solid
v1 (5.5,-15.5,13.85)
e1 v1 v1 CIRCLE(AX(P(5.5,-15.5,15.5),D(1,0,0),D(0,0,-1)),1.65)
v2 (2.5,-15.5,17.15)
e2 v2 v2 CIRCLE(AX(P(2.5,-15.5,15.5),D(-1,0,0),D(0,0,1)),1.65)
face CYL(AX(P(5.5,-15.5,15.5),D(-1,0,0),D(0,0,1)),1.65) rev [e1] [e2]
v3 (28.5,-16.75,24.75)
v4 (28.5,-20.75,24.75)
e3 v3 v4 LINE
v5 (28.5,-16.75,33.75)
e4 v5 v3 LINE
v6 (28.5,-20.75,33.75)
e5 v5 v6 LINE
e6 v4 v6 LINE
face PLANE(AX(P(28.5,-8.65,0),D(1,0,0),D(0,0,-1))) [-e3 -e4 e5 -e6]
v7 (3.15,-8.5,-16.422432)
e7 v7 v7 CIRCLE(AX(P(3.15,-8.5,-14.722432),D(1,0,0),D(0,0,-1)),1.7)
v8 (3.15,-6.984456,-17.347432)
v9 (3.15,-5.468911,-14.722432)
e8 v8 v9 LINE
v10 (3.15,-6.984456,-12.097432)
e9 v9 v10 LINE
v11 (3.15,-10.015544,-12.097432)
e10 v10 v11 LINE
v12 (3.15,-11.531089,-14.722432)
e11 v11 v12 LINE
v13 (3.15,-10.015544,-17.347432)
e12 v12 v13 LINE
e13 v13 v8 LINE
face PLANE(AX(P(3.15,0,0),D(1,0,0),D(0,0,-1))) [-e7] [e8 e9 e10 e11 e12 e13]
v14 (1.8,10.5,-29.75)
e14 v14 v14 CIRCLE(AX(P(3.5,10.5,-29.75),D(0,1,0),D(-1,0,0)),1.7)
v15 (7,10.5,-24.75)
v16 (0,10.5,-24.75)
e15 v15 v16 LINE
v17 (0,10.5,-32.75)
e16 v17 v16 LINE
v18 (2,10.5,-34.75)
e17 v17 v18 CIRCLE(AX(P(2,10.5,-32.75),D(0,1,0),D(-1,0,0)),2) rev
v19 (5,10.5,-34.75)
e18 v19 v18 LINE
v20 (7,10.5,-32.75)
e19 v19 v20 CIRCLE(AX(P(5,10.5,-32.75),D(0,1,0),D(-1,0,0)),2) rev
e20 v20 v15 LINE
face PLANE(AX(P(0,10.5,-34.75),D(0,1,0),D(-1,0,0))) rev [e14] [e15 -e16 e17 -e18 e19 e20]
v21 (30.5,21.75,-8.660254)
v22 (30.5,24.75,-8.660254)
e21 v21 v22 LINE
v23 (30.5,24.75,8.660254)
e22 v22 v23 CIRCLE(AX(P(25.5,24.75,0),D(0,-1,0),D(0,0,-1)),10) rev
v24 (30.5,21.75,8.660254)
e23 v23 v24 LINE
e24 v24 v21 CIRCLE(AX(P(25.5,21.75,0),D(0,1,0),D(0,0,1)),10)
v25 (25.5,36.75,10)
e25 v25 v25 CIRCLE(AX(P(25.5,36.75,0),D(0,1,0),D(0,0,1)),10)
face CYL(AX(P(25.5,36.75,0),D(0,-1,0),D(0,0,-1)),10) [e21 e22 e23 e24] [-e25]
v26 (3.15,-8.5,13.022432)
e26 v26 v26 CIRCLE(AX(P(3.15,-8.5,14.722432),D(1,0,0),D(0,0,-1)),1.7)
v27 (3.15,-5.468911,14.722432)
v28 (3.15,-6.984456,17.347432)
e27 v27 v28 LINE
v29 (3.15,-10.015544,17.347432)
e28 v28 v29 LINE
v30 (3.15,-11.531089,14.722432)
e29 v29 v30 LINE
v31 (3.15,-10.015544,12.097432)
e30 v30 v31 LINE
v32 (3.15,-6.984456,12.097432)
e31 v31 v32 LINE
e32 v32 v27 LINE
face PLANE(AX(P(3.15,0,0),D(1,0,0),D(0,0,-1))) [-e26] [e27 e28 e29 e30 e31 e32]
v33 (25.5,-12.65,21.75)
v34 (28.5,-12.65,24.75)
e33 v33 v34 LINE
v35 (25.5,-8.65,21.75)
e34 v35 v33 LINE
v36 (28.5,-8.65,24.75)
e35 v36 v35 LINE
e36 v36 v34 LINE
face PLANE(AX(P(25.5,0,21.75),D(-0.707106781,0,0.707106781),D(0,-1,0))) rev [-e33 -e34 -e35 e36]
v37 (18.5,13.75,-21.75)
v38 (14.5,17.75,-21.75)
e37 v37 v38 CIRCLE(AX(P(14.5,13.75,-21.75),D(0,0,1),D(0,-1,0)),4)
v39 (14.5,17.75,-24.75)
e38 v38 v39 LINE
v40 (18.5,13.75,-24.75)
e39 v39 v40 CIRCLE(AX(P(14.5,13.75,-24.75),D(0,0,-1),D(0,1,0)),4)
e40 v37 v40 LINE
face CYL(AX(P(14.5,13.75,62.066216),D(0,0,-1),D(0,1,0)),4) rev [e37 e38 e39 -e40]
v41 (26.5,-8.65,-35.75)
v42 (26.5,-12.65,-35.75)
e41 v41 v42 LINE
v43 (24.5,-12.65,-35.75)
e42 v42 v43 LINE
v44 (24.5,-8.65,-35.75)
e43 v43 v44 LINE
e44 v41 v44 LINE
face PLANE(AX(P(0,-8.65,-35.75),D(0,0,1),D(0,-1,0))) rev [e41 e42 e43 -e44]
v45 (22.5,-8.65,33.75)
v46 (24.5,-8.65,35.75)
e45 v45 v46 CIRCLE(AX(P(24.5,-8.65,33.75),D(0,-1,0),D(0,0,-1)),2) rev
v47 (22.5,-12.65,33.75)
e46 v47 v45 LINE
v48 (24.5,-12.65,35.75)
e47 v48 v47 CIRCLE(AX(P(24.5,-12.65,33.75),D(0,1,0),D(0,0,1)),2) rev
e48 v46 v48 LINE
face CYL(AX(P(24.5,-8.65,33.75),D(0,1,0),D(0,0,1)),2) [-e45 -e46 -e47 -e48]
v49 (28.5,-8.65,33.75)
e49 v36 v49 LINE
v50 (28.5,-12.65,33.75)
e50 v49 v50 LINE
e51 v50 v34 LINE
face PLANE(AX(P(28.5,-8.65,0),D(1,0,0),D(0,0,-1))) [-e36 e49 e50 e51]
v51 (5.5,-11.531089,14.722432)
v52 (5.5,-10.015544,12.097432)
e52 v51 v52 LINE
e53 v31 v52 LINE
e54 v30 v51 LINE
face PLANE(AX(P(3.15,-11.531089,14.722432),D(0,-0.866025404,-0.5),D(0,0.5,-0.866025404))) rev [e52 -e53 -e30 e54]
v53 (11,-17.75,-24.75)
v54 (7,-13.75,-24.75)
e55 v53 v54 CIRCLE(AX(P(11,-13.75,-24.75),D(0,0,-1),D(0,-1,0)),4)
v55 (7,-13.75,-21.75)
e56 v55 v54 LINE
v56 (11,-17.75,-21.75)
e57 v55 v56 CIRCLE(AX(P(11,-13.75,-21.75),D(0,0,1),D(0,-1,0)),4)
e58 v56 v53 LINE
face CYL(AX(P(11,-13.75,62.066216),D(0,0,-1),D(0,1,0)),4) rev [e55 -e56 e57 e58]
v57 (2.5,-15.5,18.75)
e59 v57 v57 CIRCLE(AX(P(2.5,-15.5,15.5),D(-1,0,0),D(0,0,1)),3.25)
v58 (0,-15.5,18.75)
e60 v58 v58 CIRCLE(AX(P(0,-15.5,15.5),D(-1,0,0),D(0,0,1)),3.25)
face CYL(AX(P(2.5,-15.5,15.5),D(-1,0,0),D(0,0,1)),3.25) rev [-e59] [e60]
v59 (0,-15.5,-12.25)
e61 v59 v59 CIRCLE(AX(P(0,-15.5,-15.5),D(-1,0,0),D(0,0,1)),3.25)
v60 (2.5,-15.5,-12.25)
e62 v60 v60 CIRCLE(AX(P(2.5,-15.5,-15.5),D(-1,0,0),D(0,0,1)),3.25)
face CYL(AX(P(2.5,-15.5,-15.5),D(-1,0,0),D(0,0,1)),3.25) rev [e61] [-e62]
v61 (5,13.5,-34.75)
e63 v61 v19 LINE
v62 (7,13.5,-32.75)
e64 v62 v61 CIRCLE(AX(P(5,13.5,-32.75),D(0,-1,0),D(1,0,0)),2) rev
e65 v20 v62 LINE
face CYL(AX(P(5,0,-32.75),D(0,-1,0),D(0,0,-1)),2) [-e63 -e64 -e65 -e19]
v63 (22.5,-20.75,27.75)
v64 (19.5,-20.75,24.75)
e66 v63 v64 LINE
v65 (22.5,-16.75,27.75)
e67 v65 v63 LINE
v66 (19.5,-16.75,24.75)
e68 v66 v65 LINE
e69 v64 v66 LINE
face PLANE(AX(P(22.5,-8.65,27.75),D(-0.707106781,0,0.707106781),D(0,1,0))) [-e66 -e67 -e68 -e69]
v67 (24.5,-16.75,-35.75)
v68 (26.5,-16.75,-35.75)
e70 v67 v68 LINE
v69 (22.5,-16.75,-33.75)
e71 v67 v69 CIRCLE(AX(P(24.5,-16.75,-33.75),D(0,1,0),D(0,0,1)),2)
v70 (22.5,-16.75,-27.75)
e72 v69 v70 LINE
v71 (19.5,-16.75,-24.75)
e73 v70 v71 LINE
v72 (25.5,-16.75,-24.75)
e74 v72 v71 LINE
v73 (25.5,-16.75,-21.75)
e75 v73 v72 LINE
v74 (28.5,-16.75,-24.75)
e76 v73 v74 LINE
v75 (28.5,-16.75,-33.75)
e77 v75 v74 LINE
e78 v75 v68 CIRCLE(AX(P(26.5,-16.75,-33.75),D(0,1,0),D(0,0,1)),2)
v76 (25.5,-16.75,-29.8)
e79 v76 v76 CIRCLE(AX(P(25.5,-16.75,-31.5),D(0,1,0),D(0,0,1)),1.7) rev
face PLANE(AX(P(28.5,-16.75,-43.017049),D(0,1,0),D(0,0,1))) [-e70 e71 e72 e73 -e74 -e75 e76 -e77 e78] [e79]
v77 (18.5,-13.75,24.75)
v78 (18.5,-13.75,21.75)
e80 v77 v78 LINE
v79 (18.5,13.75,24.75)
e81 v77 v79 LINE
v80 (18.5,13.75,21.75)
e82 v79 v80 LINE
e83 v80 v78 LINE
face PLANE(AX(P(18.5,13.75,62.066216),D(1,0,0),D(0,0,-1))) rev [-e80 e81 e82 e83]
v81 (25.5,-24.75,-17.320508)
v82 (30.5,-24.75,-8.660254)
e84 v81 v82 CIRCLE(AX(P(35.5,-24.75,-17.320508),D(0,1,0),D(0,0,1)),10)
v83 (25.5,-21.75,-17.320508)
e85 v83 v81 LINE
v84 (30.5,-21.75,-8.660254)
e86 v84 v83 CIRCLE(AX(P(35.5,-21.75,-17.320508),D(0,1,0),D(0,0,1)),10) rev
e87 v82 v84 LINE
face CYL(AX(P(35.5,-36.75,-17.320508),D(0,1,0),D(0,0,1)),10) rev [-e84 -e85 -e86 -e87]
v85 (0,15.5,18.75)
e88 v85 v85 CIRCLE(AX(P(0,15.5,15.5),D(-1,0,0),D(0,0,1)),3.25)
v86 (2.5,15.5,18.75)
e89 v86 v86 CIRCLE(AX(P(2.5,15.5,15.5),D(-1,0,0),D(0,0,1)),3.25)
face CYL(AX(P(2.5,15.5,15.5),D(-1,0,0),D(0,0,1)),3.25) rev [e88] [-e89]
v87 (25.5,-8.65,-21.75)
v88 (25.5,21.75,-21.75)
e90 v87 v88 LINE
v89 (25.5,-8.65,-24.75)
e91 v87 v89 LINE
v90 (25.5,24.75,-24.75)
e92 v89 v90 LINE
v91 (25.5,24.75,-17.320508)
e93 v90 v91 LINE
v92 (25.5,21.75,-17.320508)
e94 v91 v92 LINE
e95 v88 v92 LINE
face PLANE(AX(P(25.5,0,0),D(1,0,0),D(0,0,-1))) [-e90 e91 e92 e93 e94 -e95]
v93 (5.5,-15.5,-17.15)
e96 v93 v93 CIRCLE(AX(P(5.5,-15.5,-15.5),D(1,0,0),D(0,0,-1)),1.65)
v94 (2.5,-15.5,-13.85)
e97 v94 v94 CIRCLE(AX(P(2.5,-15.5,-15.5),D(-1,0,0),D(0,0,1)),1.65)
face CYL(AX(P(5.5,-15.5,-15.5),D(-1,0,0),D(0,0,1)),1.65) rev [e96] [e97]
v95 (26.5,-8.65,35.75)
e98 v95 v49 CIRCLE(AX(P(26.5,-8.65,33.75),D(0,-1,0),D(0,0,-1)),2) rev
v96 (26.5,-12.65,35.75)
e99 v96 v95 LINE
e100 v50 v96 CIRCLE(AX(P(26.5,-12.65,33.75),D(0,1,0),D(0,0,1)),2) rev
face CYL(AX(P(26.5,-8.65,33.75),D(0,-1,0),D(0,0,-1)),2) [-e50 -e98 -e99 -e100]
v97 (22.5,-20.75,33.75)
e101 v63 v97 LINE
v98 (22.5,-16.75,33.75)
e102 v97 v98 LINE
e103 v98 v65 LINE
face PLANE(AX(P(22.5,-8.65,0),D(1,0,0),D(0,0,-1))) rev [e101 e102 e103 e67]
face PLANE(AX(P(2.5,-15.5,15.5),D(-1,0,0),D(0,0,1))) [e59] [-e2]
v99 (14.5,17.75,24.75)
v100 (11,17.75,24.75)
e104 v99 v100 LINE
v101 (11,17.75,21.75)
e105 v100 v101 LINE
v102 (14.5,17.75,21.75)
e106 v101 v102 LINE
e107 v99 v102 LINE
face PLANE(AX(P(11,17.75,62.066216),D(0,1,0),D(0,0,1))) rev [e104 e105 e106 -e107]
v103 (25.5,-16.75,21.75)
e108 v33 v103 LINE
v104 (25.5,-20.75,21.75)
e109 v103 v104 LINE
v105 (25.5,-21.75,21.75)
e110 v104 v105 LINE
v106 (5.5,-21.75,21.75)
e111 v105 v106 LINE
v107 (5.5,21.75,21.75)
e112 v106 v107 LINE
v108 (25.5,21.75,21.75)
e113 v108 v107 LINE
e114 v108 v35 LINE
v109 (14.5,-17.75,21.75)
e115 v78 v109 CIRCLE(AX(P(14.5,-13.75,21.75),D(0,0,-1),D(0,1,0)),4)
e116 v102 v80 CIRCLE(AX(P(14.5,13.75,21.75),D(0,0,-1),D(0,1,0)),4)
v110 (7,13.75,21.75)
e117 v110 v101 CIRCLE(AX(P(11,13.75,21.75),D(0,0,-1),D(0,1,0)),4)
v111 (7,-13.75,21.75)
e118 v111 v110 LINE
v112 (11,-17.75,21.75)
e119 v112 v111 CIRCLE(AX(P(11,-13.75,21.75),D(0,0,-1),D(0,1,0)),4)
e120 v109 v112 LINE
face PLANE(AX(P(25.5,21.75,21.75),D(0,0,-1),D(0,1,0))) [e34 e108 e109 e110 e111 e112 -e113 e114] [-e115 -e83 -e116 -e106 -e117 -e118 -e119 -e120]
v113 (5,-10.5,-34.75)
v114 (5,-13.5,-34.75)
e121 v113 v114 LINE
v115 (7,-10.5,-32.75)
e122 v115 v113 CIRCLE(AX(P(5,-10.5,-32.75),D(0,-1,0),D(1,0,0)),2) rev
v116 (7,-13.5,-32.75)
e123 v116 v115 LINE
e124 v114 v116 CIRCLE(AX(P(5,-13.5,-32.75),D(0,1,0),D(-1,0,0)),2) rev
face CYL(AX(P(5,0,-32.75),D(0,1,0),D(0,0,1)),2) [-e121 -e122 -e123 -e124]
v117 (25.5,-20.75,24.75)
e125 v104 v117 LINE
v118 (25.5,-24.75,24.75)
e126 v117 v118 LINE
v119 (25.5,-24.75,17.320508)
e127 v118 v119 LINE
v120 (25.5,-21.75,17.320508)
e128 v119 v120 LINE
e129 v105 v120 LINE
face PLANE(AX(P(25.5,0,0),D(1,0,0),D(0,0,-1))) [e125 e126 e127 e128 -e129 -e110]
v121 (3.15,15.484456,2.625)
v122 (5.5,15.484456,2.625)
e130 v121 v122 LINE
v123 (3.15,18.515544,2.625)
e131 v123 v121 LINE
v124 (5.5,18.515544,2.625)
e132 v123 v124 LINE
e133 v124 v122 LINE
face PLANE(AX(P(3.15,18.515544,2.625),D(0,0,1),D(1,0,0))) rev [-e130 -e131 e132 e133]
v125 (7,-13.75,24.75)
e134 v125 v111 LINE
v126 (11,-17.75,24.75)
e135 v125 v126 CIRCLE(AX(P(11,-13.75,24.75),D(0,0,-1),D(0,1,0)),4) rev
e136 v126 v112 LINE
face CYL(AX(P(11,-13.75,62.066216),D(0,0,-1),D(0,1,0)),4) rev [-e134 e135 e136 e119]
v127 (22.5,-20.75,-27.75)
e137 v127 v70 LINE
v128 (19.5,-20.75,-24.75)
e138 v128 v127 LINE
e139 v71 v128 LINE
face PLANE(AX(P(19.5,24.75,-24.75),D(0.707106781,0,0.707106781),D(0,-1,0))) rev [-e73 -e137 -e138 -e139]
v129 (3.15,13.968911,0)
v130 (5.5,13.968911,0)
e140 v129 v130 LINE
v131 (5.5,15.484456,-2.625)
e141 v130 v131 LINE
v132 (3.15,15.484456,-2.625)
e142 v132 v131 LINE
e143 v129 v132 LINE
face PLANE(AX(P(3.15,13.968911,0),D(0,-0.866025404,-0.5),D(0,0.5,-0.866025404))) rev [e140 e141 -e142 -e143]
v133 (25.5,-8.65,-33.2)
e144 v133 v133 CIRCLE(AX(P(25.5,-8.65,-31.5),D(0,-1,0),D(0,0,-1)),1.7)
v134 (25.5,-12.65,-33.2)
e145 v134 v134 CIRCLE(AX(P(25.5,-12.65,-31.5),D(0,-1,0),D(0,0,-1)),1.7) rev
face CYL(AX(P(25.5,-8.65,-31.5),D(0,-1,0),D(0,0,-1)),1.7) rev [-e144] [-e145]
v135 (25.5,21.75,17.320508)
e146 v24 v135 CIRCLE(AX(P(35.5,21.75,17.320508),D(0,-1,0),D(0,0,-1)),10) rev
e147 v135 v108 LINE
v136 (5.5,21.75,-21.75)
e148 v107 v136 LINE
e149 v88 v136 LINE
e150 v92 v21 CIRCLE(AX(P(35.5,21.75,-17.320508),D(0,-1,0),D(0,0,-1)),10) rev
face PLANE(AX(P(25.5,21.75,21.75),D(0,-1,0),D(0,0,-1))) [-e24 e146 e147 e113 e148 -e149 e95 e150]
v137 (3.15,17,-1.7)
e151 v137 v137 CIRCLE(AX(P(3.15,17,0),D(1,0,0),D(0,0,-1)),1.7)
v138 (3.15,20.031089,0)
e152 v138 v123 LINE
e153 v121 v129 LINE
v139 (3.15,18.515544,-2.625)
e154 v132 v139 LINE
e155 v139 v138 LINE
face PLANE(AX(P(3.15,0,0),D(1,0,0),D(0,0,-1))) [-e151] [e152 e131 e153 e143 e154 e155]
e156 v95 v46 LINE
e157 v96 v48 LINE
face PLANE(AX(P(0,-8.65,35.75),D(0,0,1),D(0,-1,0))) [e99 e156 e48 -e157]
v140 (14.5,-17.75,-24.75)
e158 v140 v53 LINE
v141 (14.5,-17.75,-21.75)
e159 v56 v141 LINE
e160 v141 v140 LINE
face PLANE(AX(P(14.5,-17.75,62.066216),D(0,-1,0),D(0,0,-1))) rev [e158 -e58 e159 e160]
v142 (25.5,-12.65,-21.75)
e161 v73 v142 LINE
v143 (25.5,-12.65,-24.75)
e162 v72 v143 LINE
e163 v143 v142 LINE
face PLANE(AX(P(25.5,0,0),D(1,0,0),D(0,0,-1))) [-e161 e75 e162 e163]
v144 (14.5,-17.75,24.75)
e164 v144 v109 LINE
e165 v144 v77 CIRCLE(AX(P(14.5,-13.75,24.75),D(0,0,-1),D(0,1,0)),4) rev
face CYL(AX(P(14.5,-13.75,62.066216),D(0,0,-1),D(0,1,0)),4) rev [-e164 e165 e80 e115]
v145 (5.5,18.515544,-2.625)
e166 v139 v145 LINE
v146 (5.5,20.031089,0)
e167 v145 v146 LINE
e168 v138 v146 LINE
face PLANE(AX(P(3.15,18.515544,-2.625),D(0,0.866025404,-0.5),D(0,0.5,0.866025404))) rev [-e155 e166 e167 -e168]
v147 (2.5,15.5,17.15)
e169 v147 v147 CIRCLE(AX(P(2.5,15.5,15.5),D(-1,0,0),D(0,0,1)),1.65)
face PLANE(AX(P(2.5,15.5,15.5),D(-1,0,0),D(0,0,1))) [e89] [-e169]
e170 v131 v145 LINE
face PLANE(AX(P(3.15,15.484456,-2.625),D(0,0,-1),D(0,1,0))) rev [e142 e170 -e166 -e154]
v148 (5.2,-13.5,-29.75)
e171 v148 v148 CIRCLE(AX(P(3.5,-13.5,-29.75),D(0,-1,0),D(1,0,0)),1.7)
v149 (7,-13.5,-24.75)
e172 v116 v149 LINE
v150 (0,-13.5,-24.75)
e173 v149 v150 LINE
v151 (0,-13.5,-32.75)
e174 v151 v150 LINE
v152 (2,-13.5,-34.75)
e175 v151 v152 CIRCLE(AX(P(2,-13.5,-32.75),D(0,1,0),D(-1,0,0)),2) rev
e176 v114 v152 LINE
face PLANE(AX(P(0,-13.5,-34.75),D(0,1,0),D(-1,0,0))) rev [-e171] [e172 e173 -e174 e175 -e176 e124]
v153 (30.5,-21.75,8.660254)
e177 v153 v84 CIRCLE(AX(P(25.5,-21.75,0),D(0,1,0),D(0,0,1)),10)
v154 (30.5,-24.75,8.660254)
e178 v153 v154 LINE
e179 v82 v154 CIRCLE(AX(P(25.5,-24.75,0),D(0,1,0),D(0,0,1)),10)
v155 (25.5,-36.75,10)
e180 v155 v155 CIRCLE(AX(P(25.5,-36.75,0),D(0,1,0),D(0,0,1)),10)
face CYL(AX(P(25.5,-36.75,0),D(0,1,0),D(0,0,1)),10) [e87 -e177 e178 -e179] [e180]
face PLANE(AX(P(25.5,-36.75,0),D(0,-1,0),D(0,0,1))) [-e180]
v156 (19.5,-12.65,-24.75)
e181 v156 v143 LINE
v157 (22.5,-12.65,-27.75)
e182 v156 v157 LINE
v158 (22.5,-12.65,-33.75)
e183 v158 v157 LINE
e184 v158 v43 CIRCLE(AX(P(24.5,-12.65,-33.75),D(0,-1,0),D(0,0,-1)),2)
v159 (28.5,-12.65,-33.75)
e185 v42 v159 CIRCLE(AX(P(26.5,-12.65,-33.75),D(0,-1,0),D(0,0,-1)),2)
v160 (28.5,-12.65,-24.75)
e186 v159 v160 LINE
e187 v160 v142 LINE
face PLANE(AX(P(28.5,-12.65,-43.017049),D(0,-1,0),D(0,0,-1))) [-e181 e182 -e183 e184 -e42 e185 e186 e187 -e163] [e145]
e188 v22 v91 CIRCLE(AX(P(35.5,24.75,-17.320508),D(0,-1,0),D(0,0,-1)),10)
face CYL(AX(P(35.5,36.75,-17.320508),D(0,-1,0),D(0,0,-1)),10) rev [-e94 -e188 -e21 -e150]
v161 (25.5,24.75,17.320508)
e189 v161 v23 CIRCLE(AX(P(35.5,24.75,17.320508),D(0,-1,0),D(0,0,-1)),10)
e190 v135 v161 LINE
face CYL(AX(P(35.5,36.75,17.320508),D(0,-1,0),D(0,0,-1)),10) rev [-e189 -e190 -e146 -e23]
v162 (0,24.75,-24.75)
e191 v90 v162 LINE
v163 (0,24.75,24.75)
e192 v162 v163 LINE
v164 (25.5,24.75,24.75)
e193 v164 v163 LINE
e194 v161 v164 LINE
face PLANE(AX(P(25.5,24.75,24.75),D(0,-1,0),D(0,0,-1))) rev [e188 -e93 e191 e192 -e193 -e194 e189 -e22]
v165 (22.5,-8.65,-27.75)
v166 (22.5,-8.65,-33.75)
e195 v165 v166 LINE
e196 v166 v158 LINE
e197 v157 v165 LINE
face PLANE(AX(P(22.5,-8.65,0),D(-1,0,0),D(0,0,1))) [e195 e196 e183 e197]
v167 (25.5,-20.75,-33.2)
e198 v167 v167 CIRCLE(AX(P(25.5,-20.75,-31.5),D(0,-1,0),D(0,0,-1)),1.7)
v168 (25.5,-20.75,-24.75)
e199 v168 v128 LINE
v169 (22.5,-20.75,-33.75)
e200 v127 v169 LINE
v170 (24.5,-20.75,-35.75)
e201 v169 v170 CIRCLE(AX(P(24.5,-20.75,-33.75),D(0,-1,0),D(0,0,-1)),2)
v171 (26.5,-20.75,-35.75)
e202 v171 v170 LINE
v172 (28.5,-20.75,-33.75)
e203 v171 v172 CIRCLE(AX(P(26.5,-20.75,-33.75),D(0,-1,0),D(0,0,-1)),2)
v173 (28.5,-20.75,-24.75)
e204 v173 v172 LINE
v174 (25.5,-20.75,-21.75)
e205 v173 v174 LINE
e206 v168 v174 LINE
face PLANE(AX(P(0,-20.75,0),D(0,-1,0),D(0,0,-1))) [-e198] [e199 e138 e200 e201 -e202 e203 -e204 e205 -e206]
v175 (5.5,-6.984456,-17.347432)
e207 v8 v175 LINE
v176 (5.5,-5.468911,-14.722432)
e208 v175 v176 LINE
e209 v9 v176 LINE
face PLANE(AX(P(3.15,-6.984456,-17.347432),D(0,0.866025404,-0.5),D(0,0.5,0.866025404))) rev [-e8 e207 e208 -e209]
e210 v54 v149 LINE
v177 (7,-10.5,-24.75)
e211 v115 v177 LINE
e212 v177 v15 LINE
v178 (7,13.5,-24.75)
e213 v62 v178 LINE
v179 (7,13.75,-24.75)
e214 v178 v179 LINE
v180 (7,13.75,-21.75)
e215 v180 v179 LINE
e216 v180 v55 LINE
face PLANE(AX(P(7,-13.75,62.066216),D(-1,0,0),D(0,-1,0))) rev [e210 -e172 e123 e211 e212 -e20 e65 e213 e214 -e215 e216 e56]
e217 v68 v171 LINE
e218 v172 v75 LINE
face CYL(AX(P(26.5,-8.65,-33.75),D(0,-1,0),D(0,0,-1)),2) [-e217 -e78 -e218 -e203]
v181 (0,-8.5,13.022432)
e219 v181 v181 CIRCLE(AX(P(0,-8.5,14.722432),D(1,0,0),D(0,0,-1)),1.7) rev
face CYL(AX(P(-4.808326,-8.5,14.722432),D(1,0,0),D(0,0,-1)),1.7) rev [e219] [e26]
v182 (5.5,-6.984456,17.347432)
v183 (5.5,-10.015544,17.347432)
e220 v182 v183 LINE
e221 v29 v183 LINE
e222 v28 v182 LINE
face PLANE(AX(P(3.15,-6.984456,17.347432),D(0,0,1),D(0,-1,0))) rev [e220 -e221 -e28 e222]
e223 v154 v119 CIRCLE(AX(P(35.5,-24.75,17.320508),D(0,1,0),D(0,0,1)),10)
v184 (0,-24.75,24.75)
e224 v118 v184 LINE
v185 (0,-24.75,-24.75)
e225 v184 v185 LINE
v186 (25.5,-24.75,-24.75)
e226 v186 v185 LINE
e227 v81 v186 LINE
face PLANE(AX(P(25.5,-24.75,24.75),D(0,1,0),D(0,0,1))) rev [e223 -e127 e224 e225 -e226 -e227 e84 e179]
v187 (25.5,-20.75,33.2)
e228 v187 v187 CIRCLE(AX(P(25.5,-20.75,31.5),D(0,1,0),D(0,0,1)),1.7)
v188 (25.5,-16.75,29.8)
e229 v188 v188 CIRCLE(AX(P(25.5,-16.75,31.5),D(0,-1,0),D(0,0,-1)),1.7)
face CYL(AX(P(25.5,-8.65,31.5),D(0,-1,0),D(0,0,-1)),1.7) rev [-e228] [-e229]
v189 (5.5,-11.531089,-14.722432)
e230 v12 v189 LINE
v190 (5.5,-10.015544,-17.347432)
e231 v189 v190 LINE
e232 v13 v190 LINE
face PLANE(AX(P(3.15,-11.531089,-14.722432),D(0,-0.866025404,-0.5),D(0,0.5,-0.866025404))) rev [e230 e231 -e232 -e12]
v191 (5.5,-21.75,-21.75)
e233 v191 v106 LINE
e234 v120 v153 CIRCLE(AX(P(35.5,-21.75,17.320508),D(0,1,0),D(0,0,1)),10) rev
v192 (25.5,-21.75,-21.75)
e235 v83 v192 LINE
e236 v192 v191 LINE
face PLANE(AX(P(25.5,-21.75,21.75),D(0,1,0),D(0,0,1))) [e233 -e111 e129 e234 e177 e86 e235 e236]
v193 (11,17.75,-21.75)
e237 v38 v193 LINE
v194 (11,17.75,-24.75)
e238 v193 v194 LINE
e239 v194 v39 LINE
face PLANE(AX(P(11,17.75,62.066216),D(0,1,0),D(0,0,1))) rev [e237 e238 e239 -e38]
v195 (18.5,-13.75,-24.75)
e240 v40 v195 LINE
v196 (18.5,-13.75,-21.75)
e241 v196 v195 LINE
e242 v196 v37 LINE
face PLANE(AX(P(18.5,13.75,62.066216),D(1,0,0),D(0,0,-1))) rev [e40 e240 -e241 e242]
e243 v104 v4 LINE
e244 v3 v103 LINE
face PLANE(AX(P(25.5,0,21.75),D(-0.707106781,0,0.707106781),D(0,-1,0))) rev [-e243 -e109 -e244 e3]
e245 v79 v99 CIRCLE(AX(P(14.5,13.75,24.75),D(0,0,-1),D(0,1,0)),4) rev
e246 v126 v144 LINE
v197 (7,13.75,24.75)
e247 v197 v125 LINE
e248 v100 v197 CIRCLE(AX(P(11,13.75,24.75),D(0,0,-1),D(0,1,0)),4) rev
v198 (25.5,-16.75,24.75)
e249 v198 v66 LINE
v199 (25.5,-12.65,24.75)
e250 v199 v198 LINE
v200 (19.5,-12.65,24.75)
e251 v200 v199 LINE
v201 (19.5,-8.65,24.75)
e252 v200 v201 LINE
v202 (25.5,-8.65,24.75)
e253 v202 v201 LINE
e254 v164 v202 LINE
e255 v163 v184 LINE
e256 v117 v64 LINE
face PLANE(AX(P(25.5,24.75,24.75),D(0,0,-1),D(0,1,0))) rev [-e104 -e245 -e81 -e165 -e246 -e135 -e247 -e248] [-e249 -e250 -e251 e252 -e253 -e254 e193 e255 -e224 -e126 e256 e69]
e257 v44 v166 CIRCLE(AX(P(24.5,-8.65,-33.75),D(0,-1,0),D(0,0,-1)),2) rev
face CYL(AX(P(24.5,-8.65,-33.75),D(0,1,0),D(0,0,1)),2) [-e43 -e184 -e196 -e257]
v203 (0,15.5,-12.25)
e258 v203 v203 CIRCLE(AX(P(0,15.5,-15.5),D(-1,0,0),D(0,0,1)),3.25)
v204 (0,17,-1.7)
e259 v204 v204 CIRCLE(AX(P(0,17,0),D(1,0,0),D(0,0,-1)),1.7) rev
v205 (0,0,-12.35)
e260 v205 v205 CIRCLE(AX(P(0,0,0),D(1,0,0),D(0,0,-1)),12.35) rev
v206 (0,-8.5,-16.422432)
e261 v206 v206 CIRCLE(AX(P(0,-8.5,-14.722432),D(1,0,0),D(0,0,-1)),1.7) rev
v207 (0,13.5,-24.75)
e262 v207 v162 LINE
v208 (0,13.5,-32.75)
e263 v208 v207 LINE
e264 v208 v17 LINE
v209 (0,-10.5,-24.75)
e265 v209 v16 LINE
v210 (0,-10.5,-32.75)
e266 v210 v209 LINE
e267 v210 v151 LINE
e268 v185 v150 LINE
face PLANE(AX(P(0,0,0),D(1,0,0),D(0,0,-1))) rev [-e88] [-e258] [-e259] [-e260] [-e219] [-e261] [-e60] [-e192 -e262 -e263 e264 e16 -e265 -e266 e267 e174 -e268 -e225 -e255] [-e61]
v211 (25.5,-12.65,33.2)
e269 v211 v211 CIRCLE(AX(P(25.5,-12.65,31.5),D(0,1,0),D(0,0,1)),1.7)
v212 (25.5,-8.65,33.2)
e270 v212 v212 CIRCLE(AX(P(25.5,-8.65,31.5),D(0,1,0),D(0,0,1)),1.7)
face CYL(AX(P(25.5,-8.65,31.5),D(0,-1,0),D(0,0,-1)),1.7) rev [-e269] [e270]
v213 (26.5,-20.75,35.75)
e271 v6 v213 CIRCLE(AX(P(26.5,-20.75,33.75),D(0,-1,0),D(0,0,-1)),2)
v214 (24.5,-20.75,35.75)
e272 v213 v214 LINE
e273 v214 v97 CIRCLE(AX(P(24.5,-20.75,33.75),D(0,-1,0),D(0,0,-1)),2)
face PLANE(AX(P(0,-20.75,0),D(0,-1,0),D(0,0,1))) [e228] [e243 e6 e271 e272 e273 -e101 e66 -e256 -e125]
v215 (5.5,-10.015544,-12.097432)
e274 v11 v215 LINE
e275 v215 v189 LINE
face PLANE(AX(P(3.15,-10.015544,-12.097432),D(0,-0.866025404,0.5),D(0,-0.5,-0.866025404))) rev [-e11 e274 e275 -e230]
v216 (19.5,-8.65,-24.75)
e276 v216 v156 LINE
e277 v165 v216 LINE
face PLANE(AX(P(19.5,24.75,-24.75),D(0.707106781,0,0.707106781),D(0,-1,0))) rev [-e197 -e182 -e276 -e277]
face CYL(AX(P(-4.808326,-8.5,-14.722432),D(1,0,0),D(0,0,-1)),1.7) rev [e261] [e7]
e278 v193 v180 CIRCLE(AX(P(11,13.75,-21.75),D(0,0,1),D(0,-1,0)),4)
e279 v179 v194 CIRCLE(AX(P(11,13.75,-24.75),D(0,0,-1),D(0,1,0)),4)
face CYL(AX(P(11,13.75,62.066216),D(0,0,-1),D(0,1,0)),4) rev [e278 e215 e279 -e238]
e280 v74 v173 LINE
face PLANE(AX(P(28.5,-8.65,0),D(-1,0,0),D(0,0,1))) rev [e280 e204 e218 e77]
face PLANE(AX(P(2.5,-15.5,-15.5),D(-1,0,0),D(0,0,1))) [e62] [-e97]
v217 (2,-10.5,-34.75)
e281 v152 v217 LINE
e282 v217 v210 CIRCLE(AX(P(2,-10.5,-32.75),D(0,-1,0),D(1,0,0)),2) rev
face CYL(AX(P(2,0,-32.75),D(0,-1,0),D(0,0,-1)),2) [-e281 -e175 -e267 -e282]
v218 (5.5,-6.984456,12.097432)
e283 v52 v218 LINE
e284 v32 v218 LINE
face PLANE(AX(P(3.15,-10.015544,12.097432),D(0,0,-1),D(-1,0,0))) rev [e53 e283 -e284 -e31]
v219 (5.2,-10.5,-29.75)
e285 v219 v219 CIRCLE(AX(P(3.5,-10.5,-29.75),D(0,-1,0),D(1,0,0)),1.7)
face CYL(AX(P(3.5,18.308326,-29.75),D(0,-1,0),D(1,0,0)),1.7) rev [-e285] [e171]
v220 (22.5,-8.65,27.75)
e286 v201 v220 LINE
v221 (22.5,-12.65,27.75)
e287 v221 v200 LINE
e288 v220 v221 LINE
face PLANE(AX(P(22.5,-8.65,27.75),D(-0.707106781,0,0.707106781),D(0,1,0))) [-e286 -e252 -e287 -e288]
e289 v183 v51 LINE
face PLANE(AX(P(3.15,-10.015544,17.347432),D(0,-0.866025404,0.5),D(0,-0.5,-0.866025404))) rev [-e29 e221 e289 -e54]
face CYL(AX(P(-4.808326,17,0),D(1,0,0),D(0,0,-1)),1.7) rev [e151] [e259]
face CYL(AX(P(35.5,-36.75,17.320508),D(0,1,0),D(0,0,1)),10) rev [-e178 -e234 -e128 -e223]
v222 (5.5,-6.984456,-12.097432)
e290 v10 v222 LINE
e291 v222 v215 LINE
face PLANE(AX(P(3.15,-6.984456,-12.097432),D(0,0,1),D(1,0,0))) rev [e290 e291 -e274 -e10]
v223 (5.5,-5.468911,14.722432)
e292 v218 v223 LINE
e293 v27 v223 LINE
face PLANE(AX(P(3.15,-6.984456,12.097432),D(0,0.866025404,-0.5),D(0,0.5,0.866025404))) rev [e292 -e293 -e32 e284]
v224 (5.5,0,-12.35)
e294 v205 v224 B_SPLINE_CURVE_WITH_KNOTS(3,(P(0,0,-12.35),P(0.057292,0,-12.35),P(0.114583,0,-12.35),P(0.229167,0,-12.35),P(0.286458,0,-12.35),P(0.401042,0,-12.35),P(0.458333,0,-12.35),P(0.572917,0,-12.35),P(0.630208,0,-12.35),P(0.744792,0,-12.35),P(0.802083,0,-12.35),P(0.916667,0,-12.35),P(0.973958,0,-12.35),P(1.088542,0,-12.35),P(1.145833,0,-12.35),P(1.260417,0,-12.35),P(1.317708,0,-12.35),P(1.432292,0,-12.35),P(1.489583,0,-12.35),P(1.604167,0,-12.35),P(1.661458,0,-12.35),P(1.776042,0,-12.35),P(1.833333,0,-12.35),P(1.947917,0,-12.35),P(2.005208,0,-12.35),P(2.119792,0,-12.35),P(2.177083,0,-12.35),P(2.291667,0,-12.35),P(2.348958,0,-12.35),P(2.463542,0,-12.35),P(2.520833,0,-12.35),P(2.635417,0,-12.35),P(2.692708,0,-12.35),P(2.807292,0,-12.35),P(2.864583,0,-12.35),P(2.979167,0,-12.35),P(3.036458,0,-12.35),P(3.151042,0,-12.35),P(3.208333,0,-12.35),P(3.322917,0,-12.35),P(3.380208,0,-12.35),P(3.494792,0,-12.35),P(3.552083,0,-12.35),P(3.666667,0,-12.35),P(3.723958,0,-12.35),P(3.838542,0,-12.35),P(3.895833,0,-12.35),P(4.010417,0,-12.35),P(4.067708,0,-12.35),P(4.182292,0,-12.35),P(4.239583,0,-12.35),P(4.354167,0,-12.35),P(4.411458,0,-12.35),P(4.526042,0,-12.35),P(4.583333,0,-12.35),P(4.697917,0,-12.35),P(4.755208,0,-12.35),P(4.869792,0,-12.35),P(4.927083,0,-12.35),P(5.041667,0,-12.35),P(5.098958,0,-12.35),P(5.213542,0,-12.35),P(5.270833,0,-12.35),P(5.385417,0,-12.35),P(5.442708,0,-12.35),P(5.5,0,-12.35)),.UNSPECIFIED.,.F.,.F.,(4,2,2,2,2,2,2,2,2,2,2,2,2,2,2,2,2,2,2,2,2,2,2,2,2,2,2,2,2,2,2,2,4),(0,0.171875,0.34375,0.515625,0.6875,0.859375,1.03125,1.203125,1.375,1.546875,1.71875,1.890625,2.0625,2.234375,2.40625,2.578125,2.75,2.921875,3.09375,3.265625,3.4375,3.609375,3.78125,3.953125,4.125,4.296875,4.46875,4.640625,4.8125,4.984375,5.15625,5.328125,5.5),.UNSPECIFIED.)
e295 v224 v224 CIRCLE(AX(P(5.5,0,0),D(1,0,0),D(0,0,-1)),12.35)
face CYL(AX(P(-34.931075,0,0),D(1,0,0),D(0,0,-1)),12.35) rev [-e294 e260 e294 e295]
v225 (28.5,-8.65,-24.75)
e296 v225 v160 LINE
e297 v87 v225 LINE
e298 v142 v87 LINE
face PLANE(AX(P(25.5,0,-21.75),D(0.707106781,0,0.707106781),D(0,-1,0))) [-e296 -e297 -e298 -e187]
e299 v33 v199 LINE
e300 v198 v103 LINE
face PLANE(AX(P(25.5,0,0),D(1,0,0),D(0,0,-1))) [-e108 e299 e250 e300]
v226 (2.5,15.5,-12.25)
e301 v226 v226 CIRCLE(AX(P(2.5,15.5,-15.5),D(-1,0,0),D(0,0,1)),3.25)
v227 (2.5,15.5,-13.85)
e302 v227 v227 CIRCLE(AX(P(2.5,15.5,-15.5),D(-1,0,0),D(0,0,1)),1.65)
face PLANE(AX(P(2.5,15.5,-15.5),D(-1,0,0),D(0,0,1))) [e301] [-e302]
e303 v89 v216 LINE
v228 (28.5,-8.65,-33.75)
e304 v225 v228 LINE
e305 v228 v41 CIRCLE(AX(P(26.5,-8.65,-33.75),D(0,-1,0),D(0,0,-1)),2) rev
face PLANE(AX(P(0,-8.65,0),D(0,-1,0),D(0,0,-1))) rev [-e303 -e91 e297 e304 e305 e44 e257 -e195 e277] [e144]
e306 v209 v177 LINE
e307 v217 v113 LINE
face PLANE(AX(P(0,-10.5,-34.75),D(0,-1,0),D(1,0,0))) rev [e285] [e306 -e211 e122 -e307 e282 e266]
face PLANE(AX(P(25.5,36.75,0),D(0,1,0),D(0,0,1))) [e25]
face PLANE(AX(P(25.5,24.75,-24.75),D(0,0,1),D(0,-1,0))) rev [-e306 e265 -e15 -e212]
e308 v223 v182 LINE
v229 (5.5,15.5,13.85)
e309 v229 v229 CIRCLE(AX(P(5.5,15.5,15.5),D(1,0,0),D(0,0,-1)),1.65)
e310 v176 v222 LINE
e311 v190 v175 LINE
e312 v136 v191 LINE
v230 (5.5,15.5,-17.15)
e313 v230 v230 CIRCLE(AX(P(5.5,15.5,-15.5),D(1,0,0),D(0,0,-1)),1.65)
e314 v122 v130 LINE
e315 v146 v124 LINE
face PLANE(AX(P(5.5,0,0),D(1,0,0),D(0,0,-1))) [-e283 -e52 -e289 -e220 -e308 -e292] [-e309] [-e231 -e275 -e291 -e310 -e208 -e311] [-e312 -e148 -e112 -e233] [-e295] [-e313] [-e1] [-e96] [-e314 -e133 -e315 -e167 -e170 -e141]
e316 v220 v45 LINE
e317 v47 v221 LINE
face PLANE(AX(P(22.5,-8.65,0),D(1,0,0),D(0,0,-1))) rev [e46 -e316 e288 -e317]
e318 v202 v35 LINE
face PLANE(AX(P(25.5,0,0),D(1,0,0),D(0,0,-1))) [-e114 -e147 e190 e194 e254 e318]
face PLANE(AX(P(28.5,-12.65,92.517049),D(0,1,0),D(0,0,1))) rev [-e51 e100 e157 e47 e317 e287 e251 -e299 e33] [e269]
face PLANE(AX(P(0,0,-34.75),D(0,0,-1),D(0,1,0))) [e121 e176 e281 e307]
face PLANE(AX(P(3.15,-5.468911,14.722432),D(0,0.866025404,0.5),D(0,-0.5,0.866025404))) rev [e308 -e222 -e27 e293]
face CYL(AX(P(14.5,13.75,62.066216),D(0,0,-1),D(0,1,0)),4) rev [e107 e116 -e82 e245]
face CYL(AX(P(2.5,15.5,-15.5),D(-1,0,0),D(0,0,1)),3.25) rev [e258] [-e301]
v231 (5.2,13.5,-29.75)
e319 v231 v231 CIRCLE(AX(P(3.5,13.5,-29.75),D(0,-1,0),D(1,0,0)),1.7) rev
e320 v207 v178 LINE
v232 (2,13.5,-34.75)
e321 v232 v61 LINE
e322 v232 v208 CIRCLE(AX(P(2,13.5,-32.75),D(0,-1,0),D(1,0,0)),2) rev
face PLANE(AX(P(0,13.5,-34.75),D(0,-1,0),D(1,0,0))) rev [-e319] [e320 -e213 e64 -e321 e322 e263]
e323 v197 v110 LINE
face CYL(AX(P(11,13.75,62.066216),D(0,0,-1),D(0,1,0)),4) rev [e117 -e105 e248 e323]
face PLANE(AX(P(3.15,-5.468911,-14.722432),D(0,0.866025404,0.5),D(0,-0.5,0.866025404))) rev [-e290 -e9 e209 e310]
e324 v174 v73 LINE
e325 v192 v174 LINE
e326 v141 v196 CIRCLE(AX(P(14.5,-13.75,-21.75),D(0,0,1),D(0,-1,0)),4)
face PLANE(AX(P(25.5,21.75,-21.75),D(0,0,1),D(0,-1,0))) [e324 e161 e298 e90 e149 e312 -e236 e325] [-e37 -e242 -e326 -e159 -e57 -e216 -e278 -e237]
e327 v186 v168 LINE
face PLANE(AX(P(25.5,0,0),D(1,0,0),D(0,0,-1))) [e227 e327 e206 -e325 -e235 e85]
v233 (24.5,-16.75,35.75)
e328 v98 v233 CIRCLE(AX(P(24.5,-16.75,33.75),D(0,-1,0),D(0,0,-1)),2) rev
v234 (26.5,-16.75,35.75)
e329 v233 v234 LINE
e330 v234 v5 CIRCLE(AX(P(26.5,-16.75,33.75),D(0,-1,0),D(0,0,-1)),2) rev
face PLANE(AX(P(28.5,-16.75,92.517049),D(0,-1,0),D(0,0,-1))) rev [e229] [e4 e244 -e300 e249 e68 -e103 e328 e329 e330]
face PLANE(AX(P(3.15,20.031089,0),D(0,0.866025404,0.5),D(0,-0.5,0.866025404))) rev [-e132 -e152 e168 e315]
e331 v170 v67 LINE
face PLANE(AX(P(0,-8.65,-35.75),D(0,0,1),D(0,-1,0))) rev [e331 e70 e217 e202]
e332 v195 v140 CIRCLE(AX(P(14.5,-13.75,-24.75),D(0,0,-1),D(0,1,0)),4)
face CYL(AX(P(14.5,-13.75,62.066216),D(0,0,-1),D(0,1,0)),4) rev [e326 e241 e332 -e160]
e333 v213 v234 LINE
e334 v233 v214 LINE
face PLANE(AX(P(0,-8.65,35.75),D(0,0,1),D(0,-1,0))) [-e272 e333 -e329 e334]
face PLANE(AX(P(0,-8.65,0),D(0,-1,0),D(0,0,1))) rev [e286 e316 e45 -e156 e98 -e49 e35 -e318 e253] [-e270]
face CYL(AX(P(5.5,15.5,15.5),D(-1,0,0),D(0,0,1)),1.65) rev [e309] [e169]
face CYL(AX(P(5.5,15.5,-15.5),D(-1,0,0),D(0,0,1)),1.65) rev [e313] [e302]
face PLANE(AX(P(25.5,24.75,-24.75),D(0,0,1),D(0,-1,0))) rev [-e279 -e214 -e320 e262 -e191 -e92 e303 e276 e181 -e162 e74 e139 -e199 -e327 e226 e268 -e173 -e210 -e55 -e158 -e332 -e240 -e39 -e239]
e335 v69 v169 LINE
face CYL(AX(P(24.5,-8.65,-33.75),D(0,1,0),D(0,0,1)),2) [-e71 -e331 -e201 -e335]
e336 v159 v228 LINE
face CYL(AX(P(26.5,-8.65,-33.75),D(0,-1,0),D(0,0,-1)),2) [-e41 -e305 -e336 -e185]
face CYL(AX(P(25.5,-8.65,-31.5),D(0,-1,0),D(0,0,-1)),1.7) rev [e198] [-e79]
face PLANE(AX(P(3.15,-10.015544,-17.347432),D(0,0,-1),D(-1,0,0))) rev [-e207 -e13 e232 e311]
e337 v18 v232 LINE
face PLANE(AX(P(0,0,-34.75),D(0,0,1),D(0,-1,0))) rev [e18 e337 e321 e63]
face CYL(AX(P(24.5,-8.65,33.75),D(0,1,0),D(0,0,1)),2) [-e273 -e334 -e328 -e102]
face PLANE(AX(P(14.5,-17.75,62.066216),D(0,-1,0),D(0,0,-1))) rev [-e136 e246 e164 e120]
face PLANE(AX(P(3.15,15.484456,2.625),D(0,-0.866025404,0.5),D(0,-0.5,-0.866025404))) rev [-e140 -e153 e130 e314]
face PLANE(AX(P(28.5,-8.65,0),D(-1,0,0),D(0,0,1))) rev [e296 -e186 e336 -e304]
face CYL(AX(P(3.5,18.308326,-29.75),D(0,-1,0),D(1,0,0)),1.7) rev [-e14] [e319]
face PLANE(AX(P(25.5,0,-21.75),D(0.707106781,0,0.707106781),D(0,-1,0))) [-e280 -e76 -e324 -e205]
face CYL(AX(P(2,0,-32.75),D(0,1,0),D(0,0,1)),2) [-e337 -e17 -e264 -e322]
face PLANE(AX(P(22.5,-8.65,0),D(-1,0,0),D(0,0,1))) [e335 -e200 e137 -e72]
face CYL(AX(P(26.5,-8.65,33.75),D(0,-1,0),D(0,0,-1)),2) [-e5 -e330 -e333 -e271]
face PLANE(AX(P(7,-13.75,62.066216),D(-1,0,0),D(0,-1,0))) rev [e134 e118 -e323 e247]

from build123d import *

# Parameters (mm, degrees)
CROQUIS1_W              = 47
CROQUIS1_H              = 47
CROQUIS1_R              = 1.65
SALIENTE_EXTRUIR1_DEPTH = 5.5
CORTAR_EXTRUIR1_DEPTH   = 2.35
CROQUIS7_R              = 12.35
CORTAR_EXTRUIR2_DEPTH   = 5.5
CROQUIS8_R              = 1.7
CORTAR_EXTRUIR3_DEPTH   = 5.5
CROQUIS9_W              = 49.5
CROQUIS9_H              = 49.5
CROQUIS9_W_2            = 43.5
CROQUIS9_H_2            = 43.5
SALIENTE_EXTRUIR2_DEPTH = 25.5
CROQUIS10_R             = 10
SALIENTE_EXTRUIR3_DEPTH = 15
CORTAR_EXTRUIR4_REACH   = 73.141
REDONDEO1_R             = 10
CROQUIS13_R             = 1.7
SALIENTE_EXTRUIR5_DEPTH = 12.1
CORTAR_EXTRUIR5_REACH   = 73.141
CROQUIS14_W             = 6
CROQUIS14_H             = 4.1
CHAFL_N1_SIZE           = 3
CROQUIS15_W             = 7
CROQUIS15_H             = 3
SALIENTE_EXTRUIR6_DEPTH = 10
CORTAR_EXTRUIR6_REACH   = 73.157
CROQUIS16_R             = 1.7
REDONDEO2_R             = 2
REDONDEO4_R             = 2
CROQUIS18_R             = 3.25
CORTAR_EXTRUIR7_DEPTH   = 2.5


# Some blends are built 0.0001 mm under size
with BuildPart() as part:
    # Croquis1 → Saliente-Extruir1 (new body)
    with BuildSketch(Plane(origin=(0, 0, 0), x_dir=(0, 0, -1), z_dir=(1, 0, 0))):
        Rectangle(CROQUIS1_W, CROQUIS1_H)
        with Locations((-15.5, 15.5)):
            Circle(CROQUIS1_R, mode=Mode.SUBTRACT)
        with Locations((15.5, 15.5)):
            Circle(CROQUIS1_R, mode=Mode.SUBTRACT)
        with Locations((15.5, -15.5)):
            Circle(CROQUIS1_R, mode=Mode.SUBTRACT)
        with Locations((-15.5, -15.5)):
            Circle(CROQUIS1_R, mode=Mode.SUBTRACT)
    extrude(amount=SALIENTE_EXTRUIR1_DEPTH)

    # Croquis2 → Cortar-Extruir1 (cut)
    with BuildSketch(Plane(origin=(5.5, 0, 0), x_dir=(0, 0, -1), z_dir=(1, 0, 0))):
        Polygon((0, 13.968911087), (2.625, 15.484455543), (2.625, 18.515544457), (0, 20.031088913), (-2.625, 18.515544457), (-2.625, 15.484455543), align=None)
        Polygon((14.722431864, -11.531088913), (17.347431864, -10.015544457), (17.347431864, -6.984455543), (14.722431864, -5.468911087), (12.097431864, -6.984455543), (12.097431864, -10.015544457), align=None)
        Polygon((-17.347431864, -6.984455543), (-17.347431864, -10.015544457), (-14.722431864, -11.531088913), (-12.097431864, -10.015544457), (-12.097431864, -6.984455543), (-14.722431864, -5.468911087), align=None)
    extrude(amount=-CORTAR_EXTRUIR1_DEPTH, mode=Mode.SUBTRACT)

    # Croquis7 → Cortar-Extruir2 (cut)
    with BuildSketch(Plane(origin=(5.5, 0, 0), x_dir=(0, 0, -1), z_dir=(1, 0, 0))):
        Circle(CROQUIS7_R)
    extrude(amount=-CORTAR_EXTRUIR2_DEPTH, mode=Mode.SUBTRACT)

    # Croquis8 → Cortar-Extruir3 (cut)
    with BuildSketch(Plane(origin=(5.5, 0, 0), x_dir=(0, 0, -1), z_dir=(1, 0, 0))):
        with Locations((0, 17)):
            Circle(CROQUIS8_R)
        with Locations((14.722431864, -8.5)):
            Circle(CROQUIS8_R)
        with Locations((-14.722431864, -8.5)):
            Circle(CROQUIS8_R)
    extrude(amount=-CORTAR_EXTRUIR3_DEPTH, mode=Mode.SUBTRACT)

    # Croquis9 → Saliente-Extruir2 (add)
    with BuildSketch(Plane(origin=(0, 0, 0), x_dir=(0, 0, -1), z_dir=(1, 0, 0))):
        Rectangle(CROQUIS9_W, CROQUIS9_H)
        Rectangle(CROQUIS9_W_2, CROQUIS9_H_2, mode=Mode.SUBTRACT)
    extrude(amount=SALIENTE_EXTRUIR2_DEPTH)

    # Croquis10 → Saliente-Extruir3 (add)
    with BuildSketch(Plane(origin=(0, 21.75, 0), x_dir=(1, 0, 0), z_dir=(0, 1, 0))):
        with Locations(Location((25.5, 0, 0), (0, 0, 270))):
            Circle(CROQUIS10_R)
    saliente_extruir3 = extrude(amount=SALIENTE_EXTRUIR3_DEPTH)

    # Simetría1: Saliente-Extruir3 across plane
    add(saliente_extruir3.mirror(Plane.ZX))

    # Cortar-Extruir4: up to this face of the body (flat: up to its plane)
    cortar_extruir4_end = Plane(part.part.faces().sort_by_distance((12.75, 0, 24.75))[0])
    # Croquis11 → Cortar-Extruir4 (cut, up to the picked face)
    with BuildSketch(Plane(origin=(0, 0, -24.75), x_dir=(-1, 0, 0), z_dir=(0, 0, -1)), mode=Mode.PRIVATE) as cortar_extruir4_sk1:
        with BuildLine():
            Line((-7, -13.75), (-7, 13.75))
            ThreePointArc((-7, 13.75), (-8.171572875, 16.578427125), (-11, 17.75))
            Line((-11, 17.75), (-14.5, 17.75))
            ThreePointArc((-14.5, 17.75), (-17.328427125, 16.578427125), (-18.5, 13.75))
            Line((-18.5, 13.75), (-18.5, -13.75))
            ThreePointArc((-18.5, -13.75), (-17.328427125, -16.578427125), (-14.5, -17.75))
            Line((-14.5, -17.75), (-11, -17.75))
            ThreePointArc((-11, -17.75), (-8.171572875, -16.578427125), (-7, -13.75))
        make_face()
    cortar_extruir4_tool1 = split(extrude(cortar_extruir4_sk1.sketch, amount=-CORTAR_EXTRUIR4_REACH, mode=Mode.PRIVATE), bisect_by=cortar_extruir4_end, keep=Keep.BOTH, mode=Mode.PRIVATE)
    add(cortar_extruir4_tool1.solids().sort_by(Axis((12.75, 0, -24.75), (0, 0, 1)))[0], mode=Mode.SUBTRACT)

    # Redondeo1
    # the kernel refuses this fillet: 10 mm, written as the material it adds along each edge
    with BuildSketch(Plane(origin=(25.5, 21.75, 10), x_dir=(0, 0, 1), z_dir=(0, 1, 0)), Plane(origin=(25.5, 24.75, -10), x_dir=(0, 0, -1), z_dir=(0, -1, 0))) as redondeo1_piece_1:
        with BuildLine():
            CenterArc((7.320508076, 10), REDONDEO1_R, 210, 60)
            ThreePointArc((-1.339745962, 5), (-0.340741737, 2.588190451), (0, 0))
            Line((0, 0), (7.320508076, 0))
        make_face()
    extrude(amount=3)
    with BuildSketch(Plane(origin=(25.5, -24.75, -10), x_dir=(0, 0, -1), z_dir=(0, 1, 0))) as redondeo1_piece_2:
        with BuildLine():
            CenterArc((7.320508076, -10), REDONDEO1_R, 90, 60)
            ThreePointArc((-1.339745962, -5), (-0.340741737, -2.588190451), (0, 0))
            Line((0, 0), (7.320508076, 0))
        make_face()
    extrude(amount=3)
    with BuildSketch(Plane(origin=(25.5, -21.75, 10), x_dir=(0.9659258262890682, 0, -0.2588190451025209), z_dir=(0, -1, 0))) as redondeo1_piece_3:
        with BuildLine():
            CenterArc((7.764571353, 9.659258263), REDONDEO1_R, 195, 60)
            Line((-1.89468691, 7.071067812), (0, 0))
            ThreePointArc((0, 0), (2.588190451, 0.340741737), (5.176380902, 0))
        make_face()
    extrude(amount=3)

    # Croquis13 → Saliente-Extruir5 (add)
    with BuildSketch(Plane.XZ.offset(20.75)):
        Polygon((28.5, -35.75), (28.5, -24.75), (22.5, -24.75), (22.5, -35.75), (23.977414586, -35.75), (27.022585414, -35.75), align=None)
        with Locations(Location((25.5, -31.5, 0), (0, 0, 270))):
            Circle(CROQUIS13_R, mode=Mode.SUBTRACT)
    saliente_extruir5 = extrude(amount=-SALIENTE_EXTRUIR5_DEPTH)

    # Cortar-Extruir5: up to this face of the body (flat: up to its plane)
    cortar_extruir5_end = Plane(part.part.faces().sort_by_distance((25.5, -14.7, -35.75))[0])
    # Croquis14 → Cortar-Extruir5 (cut, up to the picked face)
    with BuildSketch(Plane(origin=(0, 0, -24.75), x_dir=(-1, 0, 0), z_dir=(0, 0, -1)), mode=Mode.PRIVATE) as cortar_extruir5_sk1:
        with Locations((-25.5, -14.7)):
            Rectangle(CROQUIS14_W, CROQUIS14_H)
    cortar_extruir5_tool1 = split(extrude(cortar_extruir5_sk1.sketch, amount=CORTAR_EXTRUIR5_REACH, mode=Mode.PRIVATE), bisect_by=cortar_extruir5_end, keep=Keep.BOTH, mode=Mode.PRIVATE)
    cortar_extruir5 = cortar_extruir5_tool1.solids().sort_by(Axis((25.5, -14.7, -24.75), (0, 0, -1)))[0]
    add(cortar_extruir5, mode=Mode.SUBTRACT)

    # Simetría2: Saliente-Extruir5, Cortar-Extruir5 across plane
    add(saliente_extruir5.mirror(Plane.XY))
    add(cortar_extruir5.mirror(Plane.XY), mode=Mode.SUBTRACT)

    # Chaflán1
    chafl_n1_edges = [part.edges().sort_by_distance(p)[0] for p in [
        (25.5, -18.75, -24.75),
        (22.5, -10.65, -24.75),
        (22.5, -18.75, -24.75),
        (25.5, -10.65, -24.75),
        (25.5, -10.65, 24.75),
        (22.5, -10.65, 24.75),
        (22.5, -18.75, 24.75),
        (25.5, -18.75, 24.75),
    ]]
    chamfer(chafl_n1_edges, length=CHAFL_N1_SIZE - 0.0001)  # a hair under: the kernel refuses the full size

    # Croquis15 → Saliente-Extruir6 (add)
    with BuildSketch(Plane(origin=(0, 0, -24.75), x_dir=(-1, 0, 0), z_dir=(0, 0, -1))):
        with Locations((-3.5, 12)):
            Rectangle(CROQUIS15_W, CROQUIS15_H)
        with Locations((-3.5, -12)):
            Rectangle(CROQUIS15_W, CROQUIS15_H)
    extrude(amount=SALIENTE_EXTRUIR6_DEPTH)

    # Cortar-Extruir6: up to this face of the body (flat: up to its plane)
    cortar_extruir6_end = Plane(part.part.faces().sort_by_distance((3.5, 13.5, -29.75))[0])
    # Croquis16 → Cortar-Extruir6 (cut, up to the picked face)
    with BuildSketch(Plane.XZ.offset(13.5), mode=Mode.PRIVATE) as cortar_extruir6_sk1:
        with Locations((3.5, -29.75)):
            Circle(CROQUIS16_R)
    cortar_extruir6_tool1 = split(extrude(cortar_extruir6_sk1.sketch, amount=-CORTAR_EXTRUIR6_REACH, mode=Mode.PRIVATE), bisect_by=cortar_extruir6_end, keep=Keep.BOTH, mode=Mode.PRIVATE)
    add(cortar_extruir6_tool1.solids().sort_by(Axis((3.5, -13.5, -29.75), (0, 1, 0)))[0], mode=Mode.SUBTRACT)

    # Redondeo2
    redondeo2_edges = [part.edges().sort_by_distance(p)[0] for p in [
        (0, 12, -34.75),
        (7, 12, -34.75),
        (0, -12, -34.75),
        (7, -12, -34.75),
    ]]
    fillet(redondeo2_edges, radius=REDONDEO2_R)

    # Redondeo4
    redondeo4_edges = [part.edges().sort_by_distance(p)[0] for p in [
        (28.5, -10.65, -35.75),
        (22.5, -10.65, -35.75),
        (28.5, -18.75, -35.75),
        (22.5, -18.75, -35.75),
        (22.5, -10.65, 35.75),
        (28.5, -10.65, 35.75),
        (22.5, -18.75, 35.75),
        (28.5, -18.75, 35.75),
    ]]
    fillet(redondeo4_edges, radius=REDONDEO4_R)

    # Croquis18 → Cortar-Extruir7 (cut)
    with BuildSketch(Plane.ZY):
        with Locations((-15.5, 15.5)):
            Circle(CROQUIS18_R)
        with Locations((15.5, 15.5)):
            Circle(CROQUIS18_R)
        with Locations((15.5, -15.5)):
            Circle(CROQUIS18_R)
        with Locations((-15.5, -15.5)):
            Circle(CROQUIS18_R)
    extrude(amount=-CORTAR_EXTRUIR7_DEPTH, mode=Mode.SUBTRACT)


solid = part.part
